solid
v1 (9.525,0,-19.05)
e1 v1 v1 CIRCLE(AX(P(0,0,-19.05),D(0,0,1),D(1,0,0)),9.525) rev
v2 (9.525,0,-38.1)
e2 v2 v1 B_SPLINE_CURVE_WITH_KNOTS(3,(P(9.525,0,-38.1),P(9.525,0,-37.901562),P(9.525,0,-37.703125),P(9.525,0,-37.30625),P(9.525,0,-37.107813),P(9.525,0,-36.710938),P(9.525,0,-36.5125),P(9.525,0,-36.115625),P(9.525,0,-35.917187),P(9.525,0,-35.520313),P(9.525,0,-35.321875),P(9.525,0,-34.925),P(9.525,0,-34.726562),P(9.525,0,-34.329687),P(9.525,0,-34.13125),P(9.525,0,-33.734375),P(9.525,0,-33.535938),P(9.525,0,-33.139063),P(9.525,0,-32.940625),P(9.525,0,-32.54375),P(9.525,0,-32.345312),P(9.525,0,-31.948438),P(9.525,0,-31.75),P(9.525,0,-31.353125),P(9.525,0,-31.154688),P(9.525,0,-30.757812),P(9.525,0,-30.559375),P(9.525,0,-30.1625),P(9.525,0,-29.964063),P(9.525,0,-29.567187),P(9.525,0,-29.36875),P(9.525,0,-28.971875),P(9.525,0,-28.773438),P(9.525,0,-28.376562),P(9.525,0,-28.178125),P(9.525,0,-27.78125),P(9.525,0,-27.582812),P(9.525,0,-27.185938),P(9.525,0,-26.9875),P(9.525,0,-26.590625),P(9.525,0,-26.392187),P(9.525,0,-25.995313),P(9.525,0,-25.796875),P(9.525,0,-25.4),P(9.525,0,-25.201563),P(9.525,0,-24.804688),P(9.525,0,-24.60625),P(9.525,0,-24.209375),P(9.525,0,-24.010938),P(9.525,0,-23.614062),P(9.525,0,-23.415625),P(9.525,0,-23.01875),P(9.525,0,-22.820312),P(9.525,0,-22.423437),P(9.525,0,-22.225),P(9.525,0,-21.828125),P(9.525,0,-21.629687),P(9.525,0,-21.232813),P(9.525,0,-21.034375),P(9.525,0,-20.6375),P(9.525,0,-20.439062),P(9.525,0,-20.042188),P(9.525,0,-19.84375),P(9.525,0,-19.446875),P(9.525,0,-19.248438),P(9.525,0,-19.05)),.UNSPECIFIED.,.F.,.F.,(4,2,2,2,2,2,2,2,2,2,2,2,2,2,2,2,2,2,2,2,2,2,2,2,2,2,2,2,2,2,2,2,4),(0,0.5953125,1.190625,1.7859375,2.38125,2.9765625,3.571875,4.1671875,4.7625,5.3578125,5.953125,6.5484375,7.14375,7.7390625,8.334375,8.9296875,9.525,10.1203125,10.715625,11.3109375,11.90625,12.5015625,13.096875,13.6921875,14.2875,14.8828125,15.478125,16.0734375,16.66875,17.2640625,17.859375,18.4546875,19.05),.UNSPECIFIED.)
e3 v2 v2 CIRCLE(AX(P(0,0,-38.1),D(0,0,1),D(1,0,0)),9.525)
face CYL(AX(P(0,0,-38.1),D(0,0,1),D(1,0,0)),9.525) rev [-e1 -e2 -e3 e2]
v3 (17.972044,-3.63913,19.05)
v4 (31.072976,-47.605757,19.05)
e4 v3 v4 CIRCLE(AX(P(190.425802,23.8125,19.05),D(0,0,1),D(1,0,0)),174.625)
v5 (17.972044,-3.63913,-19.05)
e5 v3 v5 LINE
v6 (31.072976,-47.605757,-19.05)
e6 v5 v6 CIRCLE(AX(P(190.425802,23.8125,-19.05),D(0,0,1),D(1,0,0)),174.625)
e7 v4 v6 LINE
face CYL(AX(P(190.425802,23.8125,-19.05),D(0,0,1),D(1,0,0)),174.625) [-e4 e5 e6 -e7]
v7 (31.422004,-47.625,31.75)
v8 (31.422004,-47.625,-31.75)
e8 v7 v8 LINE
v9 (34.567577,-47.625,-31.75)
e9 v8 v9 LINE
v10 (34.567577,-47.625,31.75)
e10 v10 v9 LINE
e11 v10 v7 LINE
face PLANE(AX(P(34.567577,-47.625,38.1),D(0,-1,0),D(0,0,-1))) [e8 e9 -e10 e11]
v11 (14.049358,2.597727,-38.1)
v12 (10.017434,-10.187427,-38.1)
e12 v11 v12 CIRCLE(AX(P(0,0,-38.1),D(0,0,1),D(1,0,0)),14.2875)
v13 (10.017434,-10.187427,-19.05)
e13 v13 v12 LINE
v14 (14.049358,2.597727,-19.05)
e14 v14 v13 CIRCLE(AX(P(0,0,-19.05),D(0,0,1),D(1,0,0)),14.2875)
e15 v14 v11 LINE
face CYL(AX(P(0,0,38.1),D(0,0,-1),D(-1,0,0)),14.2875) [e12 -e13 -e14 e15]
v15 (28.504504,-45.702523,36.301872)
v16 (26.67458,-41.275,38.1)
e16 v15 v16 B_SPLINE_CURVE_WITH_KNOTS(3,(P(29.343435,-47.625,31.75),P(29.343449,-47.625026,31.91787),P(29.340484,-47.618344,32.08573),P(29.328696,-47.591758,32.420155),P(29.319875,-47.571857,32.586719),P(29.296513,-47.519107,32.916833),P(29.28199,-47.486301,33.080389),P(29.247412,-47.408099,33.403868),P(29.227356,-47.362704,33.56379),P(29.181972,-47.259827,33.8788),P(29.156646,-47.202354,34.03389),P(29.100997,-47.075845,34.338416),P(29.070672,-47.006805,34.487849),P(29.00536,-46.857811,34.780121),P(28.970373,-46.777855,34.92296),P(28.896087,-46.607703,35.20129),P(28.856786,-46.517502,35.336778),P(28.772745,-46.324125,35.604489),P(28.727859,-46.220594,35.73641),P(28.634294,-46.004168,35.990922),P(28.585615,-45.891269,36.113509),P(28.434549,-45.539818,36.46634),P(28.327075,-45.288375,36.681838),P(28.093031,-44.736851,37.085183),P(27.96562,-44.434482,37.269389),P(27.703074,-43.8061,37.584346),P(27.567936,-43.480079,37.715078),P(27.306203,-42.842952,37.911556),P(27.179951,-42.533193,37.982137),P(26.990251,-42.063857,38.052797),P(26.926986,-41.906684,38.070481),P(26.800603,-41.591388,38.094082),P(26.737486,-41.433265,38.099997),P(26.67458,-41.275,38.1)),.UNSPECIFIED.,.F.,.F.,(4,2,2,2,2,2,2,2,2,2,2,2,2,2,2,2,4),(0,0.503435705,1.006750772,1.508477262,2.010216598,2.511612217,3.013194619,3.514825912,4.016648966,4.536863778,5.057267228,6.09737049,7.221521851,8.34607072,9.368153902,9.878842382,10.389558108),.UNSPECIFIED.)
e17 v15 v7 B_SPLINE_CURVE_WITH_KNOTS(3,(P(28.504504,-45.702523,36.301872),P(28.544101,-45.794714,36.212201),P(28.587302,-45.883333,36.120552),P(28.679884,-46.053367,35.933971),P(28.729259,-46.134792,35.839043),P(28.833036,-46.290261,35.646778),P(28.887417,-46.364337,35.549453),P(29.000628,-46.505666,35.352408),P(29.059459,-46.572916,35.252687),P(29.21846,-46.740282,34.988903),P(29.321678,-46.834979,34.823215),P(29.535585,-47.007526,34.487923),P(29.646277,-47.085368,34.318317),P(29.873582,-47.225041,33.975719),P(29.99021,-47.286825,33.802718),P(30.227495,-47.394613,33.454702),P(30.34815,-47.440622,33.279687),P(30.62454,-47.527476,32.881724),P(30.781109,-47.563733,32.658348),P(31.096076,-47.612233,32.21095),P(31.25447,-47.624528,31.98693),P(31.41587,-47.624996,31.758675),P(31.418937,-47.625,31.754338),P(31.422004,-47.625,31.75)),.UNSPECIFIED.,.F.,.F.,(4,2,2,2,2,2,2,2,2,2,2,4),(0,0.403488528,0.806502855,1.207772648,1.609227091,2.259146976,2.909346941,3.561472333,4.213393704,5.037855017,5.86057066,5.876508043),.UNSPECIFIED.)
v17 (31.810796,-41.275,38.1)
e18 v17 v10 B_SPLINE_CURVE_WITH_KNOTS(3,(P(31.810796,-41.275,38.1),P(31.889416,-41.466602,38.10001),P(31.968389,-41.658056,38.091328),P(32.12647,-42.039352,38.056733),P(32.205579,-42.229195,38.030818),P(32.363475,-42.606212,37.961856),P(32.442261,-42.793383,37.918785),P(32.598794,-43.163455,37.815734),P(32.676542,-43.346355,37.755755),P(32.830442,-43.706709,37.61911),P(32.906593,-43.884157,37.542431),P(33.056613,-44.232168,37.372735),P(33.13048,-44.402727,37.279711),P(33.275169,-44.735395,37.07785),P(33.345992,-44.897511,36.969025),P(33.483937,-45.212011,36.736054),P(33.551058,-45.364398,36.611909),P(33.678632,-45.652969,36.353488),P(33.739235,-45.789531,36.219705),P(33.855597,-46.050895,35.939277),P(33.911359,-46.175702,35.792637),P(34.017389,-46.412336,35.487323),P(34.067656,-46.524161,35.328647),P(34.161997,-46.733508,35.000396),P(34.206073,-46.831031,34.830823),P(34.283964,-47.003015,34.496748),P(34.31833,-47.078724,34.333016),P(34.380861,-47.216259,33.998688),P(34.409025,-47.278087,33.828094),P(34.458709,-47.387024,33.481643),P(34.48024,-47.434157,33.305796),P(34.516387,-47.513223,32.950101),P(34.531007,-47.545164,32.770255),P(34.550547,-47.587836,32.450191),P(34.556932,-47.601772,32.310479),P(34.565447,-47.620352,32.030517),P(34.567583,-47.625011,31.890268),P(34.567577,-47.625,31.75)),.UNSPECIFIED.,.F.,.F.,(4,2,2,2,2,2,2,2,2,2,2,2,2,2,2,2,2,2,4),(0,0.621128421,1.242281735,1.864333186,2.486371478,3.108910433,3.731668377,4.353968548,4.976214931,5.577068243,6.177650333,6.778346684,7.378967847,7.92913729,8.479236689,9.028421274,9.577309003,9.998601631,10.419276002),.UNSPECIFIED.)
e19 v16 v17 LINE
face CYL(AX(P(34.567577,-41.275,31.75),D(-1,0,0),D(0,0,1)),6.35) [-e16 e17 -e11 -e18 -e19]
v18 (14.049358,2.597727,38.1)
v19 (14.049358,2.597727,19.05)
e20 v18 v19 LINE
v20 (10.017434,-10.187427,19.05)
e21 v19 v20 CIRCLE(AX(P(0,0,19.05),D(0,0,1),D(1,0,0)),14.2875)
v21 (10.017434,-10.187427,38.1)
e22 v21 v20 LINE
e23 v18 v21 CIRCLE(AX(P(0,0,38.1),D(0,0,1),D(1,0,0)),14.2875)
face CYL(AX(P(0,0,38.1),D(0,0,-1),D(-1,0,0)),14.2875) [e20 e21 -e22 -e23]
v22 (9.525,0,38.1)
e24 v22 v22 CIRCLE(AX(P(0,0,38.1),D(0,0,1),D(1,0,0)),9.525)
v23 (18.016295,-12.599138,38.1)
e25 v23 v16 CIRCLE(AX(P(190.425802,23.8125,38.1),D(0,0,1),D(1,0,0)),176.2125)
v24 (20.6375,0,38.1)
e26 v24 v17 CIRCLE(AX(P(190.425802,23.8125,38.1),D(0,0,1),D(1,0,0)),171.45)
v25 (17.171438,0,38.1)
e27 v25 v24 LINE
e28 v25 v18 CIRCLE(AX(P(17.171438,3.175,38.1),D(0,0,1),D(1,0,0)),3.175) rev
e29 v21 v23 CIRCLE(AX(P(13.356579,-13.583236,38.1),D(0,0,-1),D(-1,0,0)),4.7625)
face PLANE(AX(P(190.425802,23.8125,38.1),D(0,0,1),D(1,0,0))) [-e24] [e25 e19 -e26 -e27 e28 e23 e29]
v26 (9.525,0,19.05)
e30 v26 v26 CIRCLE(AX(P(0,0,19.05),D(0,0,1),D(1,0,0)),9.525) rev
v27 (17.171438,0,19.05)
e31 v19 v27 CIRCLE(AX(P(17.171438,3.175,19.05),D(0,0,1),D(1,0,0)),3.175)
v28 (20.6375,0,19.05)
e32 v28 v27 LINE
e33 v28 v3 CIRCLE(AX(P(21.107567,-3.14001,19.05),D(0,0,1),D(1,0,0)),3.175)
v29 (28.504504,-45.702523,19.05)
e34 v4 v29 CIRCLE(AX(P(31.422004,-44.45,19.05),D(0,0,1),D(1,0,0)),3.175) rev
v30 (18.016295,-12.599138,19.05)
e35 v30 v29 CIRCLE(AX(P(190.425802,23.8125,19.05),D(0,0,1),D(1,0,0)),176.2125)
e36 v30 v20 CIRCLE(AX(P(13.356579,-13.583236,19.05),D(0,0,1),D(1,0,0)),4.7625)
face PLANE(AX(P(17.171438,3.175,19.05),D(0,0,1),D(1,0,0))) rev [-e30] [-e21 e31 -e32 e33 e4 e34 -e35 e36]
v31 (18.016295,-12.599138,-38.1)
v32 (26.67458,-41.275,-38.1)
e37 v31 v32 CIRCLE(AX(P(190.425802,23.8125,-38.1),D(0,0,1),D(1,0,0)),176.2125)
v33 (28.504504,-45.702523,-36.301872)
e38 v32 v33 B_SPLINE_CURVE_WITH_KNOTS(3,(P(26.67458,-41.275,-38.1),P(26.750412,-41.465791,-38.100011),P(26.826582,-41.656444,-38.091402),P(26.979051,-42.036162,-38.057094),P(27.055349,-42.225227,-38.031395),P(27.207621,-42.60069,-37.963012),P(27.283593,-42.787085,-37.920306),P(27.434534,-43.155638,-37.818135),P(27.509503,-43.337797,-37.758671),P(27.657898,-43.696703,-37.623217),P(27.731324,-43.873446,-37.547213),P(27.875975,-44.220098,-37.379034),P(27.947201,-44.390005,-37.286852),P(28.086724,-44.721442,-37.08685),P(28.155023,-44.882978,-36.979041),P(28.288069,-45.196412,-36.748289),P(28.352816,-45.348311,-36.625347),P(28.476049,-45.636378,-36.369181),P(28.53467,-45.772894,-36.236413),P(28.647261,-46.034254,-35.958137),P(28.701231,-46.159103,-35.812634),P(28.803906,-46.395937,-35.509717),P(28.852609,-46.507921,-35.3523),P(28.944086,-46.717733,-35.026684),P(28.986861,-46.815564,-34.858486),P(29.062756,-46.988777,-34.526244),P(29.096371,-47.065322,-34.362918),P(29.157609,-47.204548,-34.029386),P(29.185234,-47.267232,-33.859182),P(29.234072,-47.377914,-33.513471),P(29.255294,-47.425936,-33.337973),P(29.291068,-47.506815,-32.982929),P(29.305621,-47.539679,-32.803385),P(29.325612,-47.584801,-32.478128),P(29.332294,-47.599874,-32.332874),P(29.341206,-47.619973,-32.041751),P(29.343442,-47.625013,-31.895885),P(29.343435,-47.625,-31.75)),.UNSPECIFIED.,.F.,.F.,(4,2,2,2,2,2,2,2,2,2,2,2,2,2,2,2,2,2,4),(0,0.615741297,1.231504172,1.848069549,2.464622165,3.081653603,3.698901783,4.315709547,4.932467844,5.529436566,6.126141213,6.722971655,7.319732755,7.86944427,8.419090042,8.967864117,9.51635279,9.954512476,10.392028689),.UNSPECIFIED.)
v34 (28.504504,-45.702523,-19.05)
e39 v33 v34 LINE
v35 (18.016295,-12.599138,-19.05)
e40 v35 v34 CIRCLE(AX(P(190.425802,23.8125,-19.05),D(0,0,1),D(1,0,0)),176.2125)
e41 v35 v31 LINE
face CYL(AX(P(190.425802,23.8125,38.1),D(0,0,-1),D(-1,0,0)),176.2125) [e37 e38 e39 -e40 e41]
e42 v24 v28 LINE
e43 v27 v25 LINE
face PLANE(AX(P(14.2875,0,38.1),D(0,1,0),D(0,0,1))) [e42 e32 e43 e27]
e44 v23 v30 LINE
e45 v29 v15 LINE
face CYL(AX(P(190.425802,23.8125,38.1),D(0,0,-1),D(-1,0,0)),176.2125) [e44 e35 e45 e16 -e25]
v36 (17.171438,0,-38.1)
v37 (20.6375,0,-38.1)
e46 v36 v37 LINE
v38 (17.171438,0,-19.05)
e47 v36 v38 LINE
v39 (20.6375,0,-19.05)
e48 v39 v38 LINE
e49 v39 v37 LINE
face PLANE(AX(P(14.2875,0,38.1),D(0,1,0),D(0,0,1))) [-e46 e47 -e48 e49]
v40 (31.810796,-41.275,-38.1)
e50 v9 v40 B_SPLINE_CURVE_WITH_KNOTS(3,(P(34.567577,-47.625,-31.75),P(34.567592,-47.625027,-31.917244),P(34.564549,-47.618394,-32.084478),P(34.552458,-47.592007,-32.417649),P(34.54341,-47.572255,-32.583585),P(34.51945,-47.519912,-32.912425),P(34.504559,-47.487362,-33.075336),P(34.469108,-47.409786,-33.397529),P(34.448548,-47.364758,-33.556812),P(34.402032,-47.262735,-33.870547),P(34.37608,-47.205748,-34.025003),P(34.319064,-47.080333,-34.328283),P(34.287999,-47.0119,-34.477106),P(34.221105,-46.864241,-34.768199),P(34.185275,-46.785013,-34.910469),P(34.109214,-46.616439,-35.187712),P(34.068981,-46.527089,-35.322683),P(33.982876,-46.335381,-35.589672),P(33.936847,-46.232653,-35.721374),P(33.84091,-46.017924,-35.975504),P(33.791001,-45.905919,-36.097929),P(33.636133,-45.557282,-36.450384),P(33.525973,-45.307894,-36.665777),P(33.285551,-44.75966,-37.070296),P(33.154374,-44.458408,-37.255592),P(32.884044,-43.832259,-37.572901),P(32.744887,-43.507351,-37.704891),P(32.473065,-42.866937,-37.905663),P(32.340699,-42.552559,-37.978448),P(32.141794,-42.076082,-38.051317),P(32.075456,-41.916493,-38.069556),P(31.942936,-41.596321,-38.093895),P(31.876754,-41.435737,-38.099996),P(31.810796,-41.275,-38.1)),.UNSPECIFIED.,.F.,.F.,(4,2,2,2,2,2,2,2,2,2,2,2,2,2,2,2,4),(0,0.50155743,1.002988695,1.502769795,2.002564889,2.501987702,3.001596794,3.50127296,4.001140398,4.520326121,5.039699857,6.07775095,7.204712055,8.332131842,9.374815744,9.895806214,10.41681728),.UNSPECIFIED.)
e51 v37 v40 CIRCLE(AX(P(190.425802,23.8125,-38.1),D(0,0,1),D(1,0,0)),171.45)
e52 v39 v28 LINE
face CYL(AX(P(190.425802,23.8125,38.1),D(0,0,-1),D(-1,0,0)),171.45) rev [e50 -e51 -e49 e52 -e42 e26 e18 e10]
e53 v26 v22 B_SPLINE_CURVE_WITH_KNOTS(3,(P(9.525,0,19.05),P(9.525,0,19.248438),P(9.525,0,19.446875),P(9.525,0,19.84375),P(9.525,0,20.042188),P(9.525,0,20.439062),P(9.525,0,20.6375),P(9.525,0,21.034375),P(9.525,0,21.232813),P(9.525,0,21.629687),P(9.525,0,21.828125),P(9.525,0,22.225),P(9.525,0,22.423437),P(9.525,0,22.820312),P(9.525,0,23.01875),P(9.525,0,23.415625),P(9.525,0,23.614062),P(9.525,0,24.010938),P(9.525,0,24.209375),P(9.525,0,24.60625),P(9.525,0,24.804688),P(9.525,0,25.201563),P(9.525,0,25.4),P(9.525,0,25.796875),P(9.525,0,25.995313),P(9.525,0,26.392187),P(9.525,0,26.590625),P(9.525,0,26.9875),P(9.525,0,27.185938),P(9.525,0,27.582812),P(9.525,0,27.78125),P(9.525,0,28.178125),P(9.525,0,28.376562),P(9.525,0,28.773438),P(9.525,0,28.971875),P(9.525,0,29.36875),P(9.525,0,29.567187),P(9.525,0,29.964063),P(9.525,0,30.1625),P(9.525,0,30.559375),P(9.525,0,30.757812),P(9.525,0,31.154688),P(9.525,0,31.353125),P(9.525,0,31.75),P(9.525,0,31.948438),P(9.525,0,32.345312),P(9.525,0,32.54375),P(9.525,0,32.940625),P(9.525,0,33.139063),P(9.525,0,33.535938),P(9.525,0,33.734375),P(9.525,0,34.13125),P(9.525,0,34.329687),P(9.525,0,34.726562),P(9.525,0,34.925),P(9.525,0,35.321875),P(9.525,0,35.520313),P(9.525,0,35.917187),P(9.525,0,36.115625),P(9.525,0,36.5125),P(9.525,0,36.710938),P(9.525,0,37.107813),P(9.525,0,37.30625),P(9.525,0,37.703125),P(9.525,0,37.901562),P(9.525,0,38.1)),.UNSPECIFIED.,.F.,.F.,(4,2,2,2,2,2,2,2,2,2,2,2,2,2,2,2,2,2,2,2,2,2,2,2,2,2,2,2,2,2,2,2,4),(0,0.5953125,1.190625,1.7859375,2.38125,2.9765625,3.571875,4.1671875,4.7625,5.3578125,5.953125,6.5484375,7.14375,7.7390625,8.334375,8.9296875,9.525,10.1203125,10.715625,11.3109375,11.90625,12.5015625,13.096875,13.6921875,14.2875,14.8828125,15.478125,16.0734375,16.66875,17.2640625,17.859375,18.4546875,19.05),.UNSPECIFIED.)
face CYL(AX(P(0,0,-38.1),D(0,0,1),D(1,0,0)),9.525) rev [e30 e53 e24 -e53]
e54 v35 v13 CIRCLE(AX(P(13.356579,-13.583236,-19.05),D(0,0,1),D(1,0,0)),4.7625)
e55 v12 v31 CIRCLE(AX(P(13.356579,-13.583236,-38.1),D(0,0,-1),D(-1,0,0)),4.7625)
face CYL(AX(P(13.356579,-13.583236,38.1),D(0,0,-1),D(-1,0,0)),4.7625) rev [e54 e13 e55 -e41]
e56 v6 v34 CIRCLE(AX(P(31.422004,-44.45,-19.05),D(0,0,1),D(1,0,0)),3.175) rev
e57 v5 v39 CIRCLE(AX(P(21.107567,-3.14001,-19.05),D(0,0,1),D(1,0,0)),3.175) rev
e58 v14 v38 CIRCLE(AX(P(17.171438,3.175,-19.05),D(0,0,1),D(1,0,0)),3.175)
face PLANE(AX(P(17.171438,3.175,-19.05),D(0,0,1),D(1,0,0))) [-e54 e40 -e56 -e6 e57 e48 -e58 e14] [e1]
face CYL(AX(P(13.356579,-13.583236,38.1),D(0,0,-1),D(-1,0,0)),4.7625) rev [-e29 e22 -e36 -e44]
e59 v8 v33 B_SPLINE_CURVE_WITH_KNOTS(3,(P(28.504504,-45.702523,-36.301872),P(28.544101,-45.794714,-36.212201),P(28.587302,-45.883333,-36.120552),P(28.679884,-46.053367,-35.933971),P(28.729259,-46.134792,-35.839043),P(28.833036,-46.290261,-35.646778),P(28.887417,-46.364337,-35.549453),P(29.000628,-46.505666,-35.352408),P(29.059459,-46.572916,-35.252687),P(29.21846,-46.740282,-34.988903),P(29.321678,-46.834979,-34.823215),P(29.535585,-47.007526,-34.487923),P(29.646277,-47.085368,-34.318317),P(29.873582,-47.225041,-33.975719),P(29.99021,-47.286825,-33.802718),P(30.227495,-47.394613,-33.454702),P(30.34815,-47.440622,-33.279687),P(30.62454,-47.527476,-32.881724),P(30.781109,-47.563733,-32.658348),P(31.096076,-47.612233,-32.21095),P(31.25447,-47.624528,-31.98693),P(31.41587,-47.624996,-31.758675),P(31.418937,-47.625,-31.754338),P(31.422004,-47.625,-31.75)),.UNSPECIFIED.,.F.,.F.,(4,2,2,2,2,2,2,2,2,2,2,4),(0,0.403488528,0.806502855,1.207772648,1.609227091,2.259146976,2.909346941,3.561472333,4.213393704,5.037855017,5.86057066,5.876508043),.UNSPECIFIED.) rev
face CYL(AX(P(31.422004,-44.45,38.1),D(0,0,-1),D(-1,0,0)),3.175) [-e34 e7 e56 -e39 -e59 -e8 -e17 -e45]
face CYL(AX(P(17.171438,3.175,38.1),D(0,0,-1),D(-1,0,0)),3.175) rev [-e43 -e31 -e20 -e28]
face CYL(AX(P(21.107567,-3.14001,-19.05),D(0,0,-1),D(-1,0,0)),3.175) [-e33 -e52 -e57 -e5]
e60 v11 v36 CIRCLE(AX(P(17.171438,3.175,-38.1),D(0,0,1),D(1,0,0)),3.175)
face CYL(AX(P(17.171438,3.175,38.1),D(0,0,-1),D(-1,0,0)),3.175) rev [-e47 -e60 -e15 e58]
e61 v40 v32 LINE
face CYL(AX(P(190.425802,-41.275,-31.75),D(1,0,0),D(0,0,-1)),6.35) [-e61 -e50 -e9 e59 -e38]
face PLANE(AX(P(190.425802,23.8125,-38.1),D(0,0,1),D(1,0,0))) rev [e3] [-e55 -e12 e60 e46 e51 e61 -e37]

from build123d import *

# Parameters (mm, degrees)
BOSS_EXTRUDE1_DEPTH     = 38.1
FILLET1_R               = 3.175
FILLET2_R               = 6.35
FILLET3_R               = 6.35
FILLET4_R               = 3.175
CUT_EXTRUDE2_DEPTH      = 97.278232488
CUT_EXTRUDE2_DEPTH_BACK = 97.278232488
SKETCH4_R               = 9.525
CUT_EXTRUDE4_DEPTH      = 19.05
FILLET5_R               = 3.175


with BuildPart() as part:
    # Sketch1 → Boss-Extrude1 (new, symmetric)
    with BuildSketch(Plane.XY):
        with BuildLine():
            Line((14.2875, 0), (20.6375, 0))
            ThreePointArc((20.6375, 0), (25.87049136, -24.319115263), (34.567577214, -47.625))
            Line((34.567577214, -47.625), (29.343435198, -47.625))
            ThreePointArc((29.343435198, -47.625), (22.762716722, -30.40866876), (18.016295413, -12.599137554))
            ThreePointArc((18.016295413, -12.599137554), (14.73137517, -9.023483479), (10.017434273, -10.187426899))
            ThreePointArc((10.017434273, -10.187426899), (-13.17681199, 5.523068172), (14.2875, 0))
        make_face()
    extrude(amount=BOSS_EXTRUDE1_DEPTH, both=True)

    # Fillet1
    fillet1_edges = [part.edges().sort_by_distance(p)[0] for p in [
        (14.2875, 0, 0),
    ]]
    fillet(fillet1_edges, radius=FILLET1_R)

    # Fillet2
    fillet2_edges = [part.edges().sort_by_distance(p)[0] for p in [
        (31.955506206, -47.625, 38.1),
    ]]
    fillet(fillet2_edges, radius=FILLET2_R)

    # Fillet3
    fillet3_edges = [part.edges().sort_by_distance(p)[0] for p in [
        (31.955506206, -47.625, -38.1),
    ]]
    fillet(fillet3_edges, radius=FILLET3_R)

    # Fillet4
    # the kernel refuses this fillet: 3.175 mm, written as the material it takes off along each edge
    with BuildSketch(Plane(origin=(29.343435198, -47.625, -36.993879976), x_dir=(-0.3999574931440754, 0.9165336893305706, 0), z_dir=(0, 0, 1))) as fillet4_piece_1:
        with BuildLine():
            CenterArc((2.078655126, -3.174943765), FILLET4_R, 89.658986775, 66.765492029)
            Line((-0.831339338, -1.905078724), (0, 0))
            ThreePointArc((0, 0), (1.048775995, 0.003121064), (2.09755199, 0))
        make_face()
    extrude(amount=73.987759951, mode=Mode.SUBTRACT)

    # Sketch4 → Cut-Extrude2 (cut, two sides: drawn at the far end of the back side and taken through both)
    with BuildSketch(Plane.XY.offset(38.1).offset(-CUT_EXTRUDE2_DEPTH_BACK)):
        Circle(SKETCH4_R)
    extrude(amount=CUT_EXTRUDE2_DEPTH + CUT_EXTRUDE2_DEPTH_BACK, mode=Mode.SUBTRACT)

    # Sketch6 → Cut-Extrude4 (cut, symmetric)
    with BuildSketch(Plane.XY):
        with BuildLine():
            Line((29.343435198, -47.625), (31.081601096, -47.625))
            ThreePointArc((31.081601096, -47.625), (22.620737822, -24.512971667), (17.493272193, -0.440972222))
            Line((17.493272193, -0.440972222), (20.6375, 0))
            Line((20.6375, 0), (17.171437949, 0))
            ThreePointArc((17.171437949, 0), (15.140701126, 0.734358086), (14.049358322, 2.597727273))
            ThreePointArc((14.049358322, 2.597727273), (-13.625992377, 4.297090643), (10.017434273, -10.187426899))
            ThreePointArc((10.017434273, -10.187426899), (14.73137517, -9.023483479), (18.016295413, -12.599137554))
            ThreePointArc((18.016295413, -12.599137554), (22.762716722, -30.40866876), (29.343435198, -47.625))
        make_face()
    extrude(amount=CUT_EXTRUDE4_DEPTH, both=True, mode=Mode.SUBTRACT)

    # Fillet5
    # the kernel refuses this fillet: 3.175 mm, written as the material it takes off along each edge
    with BuildSketch(Plane(origin=(17.493272193, -0.440972222, -19.05), x_dir=(0.14805284588297285, -0.9889794511646602, 0), z_dir=(0, 0, 1))) as fillet5_piece_1:
        with BuildLine():
            CenterArc((3.204535532, 3.174863883), FILLET5_R, 179.469453196, 91.061093608)
            Line((0.029671649, 3.204263291), (0, 0))
            ThreePointArc((0, 0), (1.61696747, -0.007486442), (3.23393494, 0))
        make_face()
    extrude(amount=38.1, mode=Mode.SUBTRACT)


solid = part.part
